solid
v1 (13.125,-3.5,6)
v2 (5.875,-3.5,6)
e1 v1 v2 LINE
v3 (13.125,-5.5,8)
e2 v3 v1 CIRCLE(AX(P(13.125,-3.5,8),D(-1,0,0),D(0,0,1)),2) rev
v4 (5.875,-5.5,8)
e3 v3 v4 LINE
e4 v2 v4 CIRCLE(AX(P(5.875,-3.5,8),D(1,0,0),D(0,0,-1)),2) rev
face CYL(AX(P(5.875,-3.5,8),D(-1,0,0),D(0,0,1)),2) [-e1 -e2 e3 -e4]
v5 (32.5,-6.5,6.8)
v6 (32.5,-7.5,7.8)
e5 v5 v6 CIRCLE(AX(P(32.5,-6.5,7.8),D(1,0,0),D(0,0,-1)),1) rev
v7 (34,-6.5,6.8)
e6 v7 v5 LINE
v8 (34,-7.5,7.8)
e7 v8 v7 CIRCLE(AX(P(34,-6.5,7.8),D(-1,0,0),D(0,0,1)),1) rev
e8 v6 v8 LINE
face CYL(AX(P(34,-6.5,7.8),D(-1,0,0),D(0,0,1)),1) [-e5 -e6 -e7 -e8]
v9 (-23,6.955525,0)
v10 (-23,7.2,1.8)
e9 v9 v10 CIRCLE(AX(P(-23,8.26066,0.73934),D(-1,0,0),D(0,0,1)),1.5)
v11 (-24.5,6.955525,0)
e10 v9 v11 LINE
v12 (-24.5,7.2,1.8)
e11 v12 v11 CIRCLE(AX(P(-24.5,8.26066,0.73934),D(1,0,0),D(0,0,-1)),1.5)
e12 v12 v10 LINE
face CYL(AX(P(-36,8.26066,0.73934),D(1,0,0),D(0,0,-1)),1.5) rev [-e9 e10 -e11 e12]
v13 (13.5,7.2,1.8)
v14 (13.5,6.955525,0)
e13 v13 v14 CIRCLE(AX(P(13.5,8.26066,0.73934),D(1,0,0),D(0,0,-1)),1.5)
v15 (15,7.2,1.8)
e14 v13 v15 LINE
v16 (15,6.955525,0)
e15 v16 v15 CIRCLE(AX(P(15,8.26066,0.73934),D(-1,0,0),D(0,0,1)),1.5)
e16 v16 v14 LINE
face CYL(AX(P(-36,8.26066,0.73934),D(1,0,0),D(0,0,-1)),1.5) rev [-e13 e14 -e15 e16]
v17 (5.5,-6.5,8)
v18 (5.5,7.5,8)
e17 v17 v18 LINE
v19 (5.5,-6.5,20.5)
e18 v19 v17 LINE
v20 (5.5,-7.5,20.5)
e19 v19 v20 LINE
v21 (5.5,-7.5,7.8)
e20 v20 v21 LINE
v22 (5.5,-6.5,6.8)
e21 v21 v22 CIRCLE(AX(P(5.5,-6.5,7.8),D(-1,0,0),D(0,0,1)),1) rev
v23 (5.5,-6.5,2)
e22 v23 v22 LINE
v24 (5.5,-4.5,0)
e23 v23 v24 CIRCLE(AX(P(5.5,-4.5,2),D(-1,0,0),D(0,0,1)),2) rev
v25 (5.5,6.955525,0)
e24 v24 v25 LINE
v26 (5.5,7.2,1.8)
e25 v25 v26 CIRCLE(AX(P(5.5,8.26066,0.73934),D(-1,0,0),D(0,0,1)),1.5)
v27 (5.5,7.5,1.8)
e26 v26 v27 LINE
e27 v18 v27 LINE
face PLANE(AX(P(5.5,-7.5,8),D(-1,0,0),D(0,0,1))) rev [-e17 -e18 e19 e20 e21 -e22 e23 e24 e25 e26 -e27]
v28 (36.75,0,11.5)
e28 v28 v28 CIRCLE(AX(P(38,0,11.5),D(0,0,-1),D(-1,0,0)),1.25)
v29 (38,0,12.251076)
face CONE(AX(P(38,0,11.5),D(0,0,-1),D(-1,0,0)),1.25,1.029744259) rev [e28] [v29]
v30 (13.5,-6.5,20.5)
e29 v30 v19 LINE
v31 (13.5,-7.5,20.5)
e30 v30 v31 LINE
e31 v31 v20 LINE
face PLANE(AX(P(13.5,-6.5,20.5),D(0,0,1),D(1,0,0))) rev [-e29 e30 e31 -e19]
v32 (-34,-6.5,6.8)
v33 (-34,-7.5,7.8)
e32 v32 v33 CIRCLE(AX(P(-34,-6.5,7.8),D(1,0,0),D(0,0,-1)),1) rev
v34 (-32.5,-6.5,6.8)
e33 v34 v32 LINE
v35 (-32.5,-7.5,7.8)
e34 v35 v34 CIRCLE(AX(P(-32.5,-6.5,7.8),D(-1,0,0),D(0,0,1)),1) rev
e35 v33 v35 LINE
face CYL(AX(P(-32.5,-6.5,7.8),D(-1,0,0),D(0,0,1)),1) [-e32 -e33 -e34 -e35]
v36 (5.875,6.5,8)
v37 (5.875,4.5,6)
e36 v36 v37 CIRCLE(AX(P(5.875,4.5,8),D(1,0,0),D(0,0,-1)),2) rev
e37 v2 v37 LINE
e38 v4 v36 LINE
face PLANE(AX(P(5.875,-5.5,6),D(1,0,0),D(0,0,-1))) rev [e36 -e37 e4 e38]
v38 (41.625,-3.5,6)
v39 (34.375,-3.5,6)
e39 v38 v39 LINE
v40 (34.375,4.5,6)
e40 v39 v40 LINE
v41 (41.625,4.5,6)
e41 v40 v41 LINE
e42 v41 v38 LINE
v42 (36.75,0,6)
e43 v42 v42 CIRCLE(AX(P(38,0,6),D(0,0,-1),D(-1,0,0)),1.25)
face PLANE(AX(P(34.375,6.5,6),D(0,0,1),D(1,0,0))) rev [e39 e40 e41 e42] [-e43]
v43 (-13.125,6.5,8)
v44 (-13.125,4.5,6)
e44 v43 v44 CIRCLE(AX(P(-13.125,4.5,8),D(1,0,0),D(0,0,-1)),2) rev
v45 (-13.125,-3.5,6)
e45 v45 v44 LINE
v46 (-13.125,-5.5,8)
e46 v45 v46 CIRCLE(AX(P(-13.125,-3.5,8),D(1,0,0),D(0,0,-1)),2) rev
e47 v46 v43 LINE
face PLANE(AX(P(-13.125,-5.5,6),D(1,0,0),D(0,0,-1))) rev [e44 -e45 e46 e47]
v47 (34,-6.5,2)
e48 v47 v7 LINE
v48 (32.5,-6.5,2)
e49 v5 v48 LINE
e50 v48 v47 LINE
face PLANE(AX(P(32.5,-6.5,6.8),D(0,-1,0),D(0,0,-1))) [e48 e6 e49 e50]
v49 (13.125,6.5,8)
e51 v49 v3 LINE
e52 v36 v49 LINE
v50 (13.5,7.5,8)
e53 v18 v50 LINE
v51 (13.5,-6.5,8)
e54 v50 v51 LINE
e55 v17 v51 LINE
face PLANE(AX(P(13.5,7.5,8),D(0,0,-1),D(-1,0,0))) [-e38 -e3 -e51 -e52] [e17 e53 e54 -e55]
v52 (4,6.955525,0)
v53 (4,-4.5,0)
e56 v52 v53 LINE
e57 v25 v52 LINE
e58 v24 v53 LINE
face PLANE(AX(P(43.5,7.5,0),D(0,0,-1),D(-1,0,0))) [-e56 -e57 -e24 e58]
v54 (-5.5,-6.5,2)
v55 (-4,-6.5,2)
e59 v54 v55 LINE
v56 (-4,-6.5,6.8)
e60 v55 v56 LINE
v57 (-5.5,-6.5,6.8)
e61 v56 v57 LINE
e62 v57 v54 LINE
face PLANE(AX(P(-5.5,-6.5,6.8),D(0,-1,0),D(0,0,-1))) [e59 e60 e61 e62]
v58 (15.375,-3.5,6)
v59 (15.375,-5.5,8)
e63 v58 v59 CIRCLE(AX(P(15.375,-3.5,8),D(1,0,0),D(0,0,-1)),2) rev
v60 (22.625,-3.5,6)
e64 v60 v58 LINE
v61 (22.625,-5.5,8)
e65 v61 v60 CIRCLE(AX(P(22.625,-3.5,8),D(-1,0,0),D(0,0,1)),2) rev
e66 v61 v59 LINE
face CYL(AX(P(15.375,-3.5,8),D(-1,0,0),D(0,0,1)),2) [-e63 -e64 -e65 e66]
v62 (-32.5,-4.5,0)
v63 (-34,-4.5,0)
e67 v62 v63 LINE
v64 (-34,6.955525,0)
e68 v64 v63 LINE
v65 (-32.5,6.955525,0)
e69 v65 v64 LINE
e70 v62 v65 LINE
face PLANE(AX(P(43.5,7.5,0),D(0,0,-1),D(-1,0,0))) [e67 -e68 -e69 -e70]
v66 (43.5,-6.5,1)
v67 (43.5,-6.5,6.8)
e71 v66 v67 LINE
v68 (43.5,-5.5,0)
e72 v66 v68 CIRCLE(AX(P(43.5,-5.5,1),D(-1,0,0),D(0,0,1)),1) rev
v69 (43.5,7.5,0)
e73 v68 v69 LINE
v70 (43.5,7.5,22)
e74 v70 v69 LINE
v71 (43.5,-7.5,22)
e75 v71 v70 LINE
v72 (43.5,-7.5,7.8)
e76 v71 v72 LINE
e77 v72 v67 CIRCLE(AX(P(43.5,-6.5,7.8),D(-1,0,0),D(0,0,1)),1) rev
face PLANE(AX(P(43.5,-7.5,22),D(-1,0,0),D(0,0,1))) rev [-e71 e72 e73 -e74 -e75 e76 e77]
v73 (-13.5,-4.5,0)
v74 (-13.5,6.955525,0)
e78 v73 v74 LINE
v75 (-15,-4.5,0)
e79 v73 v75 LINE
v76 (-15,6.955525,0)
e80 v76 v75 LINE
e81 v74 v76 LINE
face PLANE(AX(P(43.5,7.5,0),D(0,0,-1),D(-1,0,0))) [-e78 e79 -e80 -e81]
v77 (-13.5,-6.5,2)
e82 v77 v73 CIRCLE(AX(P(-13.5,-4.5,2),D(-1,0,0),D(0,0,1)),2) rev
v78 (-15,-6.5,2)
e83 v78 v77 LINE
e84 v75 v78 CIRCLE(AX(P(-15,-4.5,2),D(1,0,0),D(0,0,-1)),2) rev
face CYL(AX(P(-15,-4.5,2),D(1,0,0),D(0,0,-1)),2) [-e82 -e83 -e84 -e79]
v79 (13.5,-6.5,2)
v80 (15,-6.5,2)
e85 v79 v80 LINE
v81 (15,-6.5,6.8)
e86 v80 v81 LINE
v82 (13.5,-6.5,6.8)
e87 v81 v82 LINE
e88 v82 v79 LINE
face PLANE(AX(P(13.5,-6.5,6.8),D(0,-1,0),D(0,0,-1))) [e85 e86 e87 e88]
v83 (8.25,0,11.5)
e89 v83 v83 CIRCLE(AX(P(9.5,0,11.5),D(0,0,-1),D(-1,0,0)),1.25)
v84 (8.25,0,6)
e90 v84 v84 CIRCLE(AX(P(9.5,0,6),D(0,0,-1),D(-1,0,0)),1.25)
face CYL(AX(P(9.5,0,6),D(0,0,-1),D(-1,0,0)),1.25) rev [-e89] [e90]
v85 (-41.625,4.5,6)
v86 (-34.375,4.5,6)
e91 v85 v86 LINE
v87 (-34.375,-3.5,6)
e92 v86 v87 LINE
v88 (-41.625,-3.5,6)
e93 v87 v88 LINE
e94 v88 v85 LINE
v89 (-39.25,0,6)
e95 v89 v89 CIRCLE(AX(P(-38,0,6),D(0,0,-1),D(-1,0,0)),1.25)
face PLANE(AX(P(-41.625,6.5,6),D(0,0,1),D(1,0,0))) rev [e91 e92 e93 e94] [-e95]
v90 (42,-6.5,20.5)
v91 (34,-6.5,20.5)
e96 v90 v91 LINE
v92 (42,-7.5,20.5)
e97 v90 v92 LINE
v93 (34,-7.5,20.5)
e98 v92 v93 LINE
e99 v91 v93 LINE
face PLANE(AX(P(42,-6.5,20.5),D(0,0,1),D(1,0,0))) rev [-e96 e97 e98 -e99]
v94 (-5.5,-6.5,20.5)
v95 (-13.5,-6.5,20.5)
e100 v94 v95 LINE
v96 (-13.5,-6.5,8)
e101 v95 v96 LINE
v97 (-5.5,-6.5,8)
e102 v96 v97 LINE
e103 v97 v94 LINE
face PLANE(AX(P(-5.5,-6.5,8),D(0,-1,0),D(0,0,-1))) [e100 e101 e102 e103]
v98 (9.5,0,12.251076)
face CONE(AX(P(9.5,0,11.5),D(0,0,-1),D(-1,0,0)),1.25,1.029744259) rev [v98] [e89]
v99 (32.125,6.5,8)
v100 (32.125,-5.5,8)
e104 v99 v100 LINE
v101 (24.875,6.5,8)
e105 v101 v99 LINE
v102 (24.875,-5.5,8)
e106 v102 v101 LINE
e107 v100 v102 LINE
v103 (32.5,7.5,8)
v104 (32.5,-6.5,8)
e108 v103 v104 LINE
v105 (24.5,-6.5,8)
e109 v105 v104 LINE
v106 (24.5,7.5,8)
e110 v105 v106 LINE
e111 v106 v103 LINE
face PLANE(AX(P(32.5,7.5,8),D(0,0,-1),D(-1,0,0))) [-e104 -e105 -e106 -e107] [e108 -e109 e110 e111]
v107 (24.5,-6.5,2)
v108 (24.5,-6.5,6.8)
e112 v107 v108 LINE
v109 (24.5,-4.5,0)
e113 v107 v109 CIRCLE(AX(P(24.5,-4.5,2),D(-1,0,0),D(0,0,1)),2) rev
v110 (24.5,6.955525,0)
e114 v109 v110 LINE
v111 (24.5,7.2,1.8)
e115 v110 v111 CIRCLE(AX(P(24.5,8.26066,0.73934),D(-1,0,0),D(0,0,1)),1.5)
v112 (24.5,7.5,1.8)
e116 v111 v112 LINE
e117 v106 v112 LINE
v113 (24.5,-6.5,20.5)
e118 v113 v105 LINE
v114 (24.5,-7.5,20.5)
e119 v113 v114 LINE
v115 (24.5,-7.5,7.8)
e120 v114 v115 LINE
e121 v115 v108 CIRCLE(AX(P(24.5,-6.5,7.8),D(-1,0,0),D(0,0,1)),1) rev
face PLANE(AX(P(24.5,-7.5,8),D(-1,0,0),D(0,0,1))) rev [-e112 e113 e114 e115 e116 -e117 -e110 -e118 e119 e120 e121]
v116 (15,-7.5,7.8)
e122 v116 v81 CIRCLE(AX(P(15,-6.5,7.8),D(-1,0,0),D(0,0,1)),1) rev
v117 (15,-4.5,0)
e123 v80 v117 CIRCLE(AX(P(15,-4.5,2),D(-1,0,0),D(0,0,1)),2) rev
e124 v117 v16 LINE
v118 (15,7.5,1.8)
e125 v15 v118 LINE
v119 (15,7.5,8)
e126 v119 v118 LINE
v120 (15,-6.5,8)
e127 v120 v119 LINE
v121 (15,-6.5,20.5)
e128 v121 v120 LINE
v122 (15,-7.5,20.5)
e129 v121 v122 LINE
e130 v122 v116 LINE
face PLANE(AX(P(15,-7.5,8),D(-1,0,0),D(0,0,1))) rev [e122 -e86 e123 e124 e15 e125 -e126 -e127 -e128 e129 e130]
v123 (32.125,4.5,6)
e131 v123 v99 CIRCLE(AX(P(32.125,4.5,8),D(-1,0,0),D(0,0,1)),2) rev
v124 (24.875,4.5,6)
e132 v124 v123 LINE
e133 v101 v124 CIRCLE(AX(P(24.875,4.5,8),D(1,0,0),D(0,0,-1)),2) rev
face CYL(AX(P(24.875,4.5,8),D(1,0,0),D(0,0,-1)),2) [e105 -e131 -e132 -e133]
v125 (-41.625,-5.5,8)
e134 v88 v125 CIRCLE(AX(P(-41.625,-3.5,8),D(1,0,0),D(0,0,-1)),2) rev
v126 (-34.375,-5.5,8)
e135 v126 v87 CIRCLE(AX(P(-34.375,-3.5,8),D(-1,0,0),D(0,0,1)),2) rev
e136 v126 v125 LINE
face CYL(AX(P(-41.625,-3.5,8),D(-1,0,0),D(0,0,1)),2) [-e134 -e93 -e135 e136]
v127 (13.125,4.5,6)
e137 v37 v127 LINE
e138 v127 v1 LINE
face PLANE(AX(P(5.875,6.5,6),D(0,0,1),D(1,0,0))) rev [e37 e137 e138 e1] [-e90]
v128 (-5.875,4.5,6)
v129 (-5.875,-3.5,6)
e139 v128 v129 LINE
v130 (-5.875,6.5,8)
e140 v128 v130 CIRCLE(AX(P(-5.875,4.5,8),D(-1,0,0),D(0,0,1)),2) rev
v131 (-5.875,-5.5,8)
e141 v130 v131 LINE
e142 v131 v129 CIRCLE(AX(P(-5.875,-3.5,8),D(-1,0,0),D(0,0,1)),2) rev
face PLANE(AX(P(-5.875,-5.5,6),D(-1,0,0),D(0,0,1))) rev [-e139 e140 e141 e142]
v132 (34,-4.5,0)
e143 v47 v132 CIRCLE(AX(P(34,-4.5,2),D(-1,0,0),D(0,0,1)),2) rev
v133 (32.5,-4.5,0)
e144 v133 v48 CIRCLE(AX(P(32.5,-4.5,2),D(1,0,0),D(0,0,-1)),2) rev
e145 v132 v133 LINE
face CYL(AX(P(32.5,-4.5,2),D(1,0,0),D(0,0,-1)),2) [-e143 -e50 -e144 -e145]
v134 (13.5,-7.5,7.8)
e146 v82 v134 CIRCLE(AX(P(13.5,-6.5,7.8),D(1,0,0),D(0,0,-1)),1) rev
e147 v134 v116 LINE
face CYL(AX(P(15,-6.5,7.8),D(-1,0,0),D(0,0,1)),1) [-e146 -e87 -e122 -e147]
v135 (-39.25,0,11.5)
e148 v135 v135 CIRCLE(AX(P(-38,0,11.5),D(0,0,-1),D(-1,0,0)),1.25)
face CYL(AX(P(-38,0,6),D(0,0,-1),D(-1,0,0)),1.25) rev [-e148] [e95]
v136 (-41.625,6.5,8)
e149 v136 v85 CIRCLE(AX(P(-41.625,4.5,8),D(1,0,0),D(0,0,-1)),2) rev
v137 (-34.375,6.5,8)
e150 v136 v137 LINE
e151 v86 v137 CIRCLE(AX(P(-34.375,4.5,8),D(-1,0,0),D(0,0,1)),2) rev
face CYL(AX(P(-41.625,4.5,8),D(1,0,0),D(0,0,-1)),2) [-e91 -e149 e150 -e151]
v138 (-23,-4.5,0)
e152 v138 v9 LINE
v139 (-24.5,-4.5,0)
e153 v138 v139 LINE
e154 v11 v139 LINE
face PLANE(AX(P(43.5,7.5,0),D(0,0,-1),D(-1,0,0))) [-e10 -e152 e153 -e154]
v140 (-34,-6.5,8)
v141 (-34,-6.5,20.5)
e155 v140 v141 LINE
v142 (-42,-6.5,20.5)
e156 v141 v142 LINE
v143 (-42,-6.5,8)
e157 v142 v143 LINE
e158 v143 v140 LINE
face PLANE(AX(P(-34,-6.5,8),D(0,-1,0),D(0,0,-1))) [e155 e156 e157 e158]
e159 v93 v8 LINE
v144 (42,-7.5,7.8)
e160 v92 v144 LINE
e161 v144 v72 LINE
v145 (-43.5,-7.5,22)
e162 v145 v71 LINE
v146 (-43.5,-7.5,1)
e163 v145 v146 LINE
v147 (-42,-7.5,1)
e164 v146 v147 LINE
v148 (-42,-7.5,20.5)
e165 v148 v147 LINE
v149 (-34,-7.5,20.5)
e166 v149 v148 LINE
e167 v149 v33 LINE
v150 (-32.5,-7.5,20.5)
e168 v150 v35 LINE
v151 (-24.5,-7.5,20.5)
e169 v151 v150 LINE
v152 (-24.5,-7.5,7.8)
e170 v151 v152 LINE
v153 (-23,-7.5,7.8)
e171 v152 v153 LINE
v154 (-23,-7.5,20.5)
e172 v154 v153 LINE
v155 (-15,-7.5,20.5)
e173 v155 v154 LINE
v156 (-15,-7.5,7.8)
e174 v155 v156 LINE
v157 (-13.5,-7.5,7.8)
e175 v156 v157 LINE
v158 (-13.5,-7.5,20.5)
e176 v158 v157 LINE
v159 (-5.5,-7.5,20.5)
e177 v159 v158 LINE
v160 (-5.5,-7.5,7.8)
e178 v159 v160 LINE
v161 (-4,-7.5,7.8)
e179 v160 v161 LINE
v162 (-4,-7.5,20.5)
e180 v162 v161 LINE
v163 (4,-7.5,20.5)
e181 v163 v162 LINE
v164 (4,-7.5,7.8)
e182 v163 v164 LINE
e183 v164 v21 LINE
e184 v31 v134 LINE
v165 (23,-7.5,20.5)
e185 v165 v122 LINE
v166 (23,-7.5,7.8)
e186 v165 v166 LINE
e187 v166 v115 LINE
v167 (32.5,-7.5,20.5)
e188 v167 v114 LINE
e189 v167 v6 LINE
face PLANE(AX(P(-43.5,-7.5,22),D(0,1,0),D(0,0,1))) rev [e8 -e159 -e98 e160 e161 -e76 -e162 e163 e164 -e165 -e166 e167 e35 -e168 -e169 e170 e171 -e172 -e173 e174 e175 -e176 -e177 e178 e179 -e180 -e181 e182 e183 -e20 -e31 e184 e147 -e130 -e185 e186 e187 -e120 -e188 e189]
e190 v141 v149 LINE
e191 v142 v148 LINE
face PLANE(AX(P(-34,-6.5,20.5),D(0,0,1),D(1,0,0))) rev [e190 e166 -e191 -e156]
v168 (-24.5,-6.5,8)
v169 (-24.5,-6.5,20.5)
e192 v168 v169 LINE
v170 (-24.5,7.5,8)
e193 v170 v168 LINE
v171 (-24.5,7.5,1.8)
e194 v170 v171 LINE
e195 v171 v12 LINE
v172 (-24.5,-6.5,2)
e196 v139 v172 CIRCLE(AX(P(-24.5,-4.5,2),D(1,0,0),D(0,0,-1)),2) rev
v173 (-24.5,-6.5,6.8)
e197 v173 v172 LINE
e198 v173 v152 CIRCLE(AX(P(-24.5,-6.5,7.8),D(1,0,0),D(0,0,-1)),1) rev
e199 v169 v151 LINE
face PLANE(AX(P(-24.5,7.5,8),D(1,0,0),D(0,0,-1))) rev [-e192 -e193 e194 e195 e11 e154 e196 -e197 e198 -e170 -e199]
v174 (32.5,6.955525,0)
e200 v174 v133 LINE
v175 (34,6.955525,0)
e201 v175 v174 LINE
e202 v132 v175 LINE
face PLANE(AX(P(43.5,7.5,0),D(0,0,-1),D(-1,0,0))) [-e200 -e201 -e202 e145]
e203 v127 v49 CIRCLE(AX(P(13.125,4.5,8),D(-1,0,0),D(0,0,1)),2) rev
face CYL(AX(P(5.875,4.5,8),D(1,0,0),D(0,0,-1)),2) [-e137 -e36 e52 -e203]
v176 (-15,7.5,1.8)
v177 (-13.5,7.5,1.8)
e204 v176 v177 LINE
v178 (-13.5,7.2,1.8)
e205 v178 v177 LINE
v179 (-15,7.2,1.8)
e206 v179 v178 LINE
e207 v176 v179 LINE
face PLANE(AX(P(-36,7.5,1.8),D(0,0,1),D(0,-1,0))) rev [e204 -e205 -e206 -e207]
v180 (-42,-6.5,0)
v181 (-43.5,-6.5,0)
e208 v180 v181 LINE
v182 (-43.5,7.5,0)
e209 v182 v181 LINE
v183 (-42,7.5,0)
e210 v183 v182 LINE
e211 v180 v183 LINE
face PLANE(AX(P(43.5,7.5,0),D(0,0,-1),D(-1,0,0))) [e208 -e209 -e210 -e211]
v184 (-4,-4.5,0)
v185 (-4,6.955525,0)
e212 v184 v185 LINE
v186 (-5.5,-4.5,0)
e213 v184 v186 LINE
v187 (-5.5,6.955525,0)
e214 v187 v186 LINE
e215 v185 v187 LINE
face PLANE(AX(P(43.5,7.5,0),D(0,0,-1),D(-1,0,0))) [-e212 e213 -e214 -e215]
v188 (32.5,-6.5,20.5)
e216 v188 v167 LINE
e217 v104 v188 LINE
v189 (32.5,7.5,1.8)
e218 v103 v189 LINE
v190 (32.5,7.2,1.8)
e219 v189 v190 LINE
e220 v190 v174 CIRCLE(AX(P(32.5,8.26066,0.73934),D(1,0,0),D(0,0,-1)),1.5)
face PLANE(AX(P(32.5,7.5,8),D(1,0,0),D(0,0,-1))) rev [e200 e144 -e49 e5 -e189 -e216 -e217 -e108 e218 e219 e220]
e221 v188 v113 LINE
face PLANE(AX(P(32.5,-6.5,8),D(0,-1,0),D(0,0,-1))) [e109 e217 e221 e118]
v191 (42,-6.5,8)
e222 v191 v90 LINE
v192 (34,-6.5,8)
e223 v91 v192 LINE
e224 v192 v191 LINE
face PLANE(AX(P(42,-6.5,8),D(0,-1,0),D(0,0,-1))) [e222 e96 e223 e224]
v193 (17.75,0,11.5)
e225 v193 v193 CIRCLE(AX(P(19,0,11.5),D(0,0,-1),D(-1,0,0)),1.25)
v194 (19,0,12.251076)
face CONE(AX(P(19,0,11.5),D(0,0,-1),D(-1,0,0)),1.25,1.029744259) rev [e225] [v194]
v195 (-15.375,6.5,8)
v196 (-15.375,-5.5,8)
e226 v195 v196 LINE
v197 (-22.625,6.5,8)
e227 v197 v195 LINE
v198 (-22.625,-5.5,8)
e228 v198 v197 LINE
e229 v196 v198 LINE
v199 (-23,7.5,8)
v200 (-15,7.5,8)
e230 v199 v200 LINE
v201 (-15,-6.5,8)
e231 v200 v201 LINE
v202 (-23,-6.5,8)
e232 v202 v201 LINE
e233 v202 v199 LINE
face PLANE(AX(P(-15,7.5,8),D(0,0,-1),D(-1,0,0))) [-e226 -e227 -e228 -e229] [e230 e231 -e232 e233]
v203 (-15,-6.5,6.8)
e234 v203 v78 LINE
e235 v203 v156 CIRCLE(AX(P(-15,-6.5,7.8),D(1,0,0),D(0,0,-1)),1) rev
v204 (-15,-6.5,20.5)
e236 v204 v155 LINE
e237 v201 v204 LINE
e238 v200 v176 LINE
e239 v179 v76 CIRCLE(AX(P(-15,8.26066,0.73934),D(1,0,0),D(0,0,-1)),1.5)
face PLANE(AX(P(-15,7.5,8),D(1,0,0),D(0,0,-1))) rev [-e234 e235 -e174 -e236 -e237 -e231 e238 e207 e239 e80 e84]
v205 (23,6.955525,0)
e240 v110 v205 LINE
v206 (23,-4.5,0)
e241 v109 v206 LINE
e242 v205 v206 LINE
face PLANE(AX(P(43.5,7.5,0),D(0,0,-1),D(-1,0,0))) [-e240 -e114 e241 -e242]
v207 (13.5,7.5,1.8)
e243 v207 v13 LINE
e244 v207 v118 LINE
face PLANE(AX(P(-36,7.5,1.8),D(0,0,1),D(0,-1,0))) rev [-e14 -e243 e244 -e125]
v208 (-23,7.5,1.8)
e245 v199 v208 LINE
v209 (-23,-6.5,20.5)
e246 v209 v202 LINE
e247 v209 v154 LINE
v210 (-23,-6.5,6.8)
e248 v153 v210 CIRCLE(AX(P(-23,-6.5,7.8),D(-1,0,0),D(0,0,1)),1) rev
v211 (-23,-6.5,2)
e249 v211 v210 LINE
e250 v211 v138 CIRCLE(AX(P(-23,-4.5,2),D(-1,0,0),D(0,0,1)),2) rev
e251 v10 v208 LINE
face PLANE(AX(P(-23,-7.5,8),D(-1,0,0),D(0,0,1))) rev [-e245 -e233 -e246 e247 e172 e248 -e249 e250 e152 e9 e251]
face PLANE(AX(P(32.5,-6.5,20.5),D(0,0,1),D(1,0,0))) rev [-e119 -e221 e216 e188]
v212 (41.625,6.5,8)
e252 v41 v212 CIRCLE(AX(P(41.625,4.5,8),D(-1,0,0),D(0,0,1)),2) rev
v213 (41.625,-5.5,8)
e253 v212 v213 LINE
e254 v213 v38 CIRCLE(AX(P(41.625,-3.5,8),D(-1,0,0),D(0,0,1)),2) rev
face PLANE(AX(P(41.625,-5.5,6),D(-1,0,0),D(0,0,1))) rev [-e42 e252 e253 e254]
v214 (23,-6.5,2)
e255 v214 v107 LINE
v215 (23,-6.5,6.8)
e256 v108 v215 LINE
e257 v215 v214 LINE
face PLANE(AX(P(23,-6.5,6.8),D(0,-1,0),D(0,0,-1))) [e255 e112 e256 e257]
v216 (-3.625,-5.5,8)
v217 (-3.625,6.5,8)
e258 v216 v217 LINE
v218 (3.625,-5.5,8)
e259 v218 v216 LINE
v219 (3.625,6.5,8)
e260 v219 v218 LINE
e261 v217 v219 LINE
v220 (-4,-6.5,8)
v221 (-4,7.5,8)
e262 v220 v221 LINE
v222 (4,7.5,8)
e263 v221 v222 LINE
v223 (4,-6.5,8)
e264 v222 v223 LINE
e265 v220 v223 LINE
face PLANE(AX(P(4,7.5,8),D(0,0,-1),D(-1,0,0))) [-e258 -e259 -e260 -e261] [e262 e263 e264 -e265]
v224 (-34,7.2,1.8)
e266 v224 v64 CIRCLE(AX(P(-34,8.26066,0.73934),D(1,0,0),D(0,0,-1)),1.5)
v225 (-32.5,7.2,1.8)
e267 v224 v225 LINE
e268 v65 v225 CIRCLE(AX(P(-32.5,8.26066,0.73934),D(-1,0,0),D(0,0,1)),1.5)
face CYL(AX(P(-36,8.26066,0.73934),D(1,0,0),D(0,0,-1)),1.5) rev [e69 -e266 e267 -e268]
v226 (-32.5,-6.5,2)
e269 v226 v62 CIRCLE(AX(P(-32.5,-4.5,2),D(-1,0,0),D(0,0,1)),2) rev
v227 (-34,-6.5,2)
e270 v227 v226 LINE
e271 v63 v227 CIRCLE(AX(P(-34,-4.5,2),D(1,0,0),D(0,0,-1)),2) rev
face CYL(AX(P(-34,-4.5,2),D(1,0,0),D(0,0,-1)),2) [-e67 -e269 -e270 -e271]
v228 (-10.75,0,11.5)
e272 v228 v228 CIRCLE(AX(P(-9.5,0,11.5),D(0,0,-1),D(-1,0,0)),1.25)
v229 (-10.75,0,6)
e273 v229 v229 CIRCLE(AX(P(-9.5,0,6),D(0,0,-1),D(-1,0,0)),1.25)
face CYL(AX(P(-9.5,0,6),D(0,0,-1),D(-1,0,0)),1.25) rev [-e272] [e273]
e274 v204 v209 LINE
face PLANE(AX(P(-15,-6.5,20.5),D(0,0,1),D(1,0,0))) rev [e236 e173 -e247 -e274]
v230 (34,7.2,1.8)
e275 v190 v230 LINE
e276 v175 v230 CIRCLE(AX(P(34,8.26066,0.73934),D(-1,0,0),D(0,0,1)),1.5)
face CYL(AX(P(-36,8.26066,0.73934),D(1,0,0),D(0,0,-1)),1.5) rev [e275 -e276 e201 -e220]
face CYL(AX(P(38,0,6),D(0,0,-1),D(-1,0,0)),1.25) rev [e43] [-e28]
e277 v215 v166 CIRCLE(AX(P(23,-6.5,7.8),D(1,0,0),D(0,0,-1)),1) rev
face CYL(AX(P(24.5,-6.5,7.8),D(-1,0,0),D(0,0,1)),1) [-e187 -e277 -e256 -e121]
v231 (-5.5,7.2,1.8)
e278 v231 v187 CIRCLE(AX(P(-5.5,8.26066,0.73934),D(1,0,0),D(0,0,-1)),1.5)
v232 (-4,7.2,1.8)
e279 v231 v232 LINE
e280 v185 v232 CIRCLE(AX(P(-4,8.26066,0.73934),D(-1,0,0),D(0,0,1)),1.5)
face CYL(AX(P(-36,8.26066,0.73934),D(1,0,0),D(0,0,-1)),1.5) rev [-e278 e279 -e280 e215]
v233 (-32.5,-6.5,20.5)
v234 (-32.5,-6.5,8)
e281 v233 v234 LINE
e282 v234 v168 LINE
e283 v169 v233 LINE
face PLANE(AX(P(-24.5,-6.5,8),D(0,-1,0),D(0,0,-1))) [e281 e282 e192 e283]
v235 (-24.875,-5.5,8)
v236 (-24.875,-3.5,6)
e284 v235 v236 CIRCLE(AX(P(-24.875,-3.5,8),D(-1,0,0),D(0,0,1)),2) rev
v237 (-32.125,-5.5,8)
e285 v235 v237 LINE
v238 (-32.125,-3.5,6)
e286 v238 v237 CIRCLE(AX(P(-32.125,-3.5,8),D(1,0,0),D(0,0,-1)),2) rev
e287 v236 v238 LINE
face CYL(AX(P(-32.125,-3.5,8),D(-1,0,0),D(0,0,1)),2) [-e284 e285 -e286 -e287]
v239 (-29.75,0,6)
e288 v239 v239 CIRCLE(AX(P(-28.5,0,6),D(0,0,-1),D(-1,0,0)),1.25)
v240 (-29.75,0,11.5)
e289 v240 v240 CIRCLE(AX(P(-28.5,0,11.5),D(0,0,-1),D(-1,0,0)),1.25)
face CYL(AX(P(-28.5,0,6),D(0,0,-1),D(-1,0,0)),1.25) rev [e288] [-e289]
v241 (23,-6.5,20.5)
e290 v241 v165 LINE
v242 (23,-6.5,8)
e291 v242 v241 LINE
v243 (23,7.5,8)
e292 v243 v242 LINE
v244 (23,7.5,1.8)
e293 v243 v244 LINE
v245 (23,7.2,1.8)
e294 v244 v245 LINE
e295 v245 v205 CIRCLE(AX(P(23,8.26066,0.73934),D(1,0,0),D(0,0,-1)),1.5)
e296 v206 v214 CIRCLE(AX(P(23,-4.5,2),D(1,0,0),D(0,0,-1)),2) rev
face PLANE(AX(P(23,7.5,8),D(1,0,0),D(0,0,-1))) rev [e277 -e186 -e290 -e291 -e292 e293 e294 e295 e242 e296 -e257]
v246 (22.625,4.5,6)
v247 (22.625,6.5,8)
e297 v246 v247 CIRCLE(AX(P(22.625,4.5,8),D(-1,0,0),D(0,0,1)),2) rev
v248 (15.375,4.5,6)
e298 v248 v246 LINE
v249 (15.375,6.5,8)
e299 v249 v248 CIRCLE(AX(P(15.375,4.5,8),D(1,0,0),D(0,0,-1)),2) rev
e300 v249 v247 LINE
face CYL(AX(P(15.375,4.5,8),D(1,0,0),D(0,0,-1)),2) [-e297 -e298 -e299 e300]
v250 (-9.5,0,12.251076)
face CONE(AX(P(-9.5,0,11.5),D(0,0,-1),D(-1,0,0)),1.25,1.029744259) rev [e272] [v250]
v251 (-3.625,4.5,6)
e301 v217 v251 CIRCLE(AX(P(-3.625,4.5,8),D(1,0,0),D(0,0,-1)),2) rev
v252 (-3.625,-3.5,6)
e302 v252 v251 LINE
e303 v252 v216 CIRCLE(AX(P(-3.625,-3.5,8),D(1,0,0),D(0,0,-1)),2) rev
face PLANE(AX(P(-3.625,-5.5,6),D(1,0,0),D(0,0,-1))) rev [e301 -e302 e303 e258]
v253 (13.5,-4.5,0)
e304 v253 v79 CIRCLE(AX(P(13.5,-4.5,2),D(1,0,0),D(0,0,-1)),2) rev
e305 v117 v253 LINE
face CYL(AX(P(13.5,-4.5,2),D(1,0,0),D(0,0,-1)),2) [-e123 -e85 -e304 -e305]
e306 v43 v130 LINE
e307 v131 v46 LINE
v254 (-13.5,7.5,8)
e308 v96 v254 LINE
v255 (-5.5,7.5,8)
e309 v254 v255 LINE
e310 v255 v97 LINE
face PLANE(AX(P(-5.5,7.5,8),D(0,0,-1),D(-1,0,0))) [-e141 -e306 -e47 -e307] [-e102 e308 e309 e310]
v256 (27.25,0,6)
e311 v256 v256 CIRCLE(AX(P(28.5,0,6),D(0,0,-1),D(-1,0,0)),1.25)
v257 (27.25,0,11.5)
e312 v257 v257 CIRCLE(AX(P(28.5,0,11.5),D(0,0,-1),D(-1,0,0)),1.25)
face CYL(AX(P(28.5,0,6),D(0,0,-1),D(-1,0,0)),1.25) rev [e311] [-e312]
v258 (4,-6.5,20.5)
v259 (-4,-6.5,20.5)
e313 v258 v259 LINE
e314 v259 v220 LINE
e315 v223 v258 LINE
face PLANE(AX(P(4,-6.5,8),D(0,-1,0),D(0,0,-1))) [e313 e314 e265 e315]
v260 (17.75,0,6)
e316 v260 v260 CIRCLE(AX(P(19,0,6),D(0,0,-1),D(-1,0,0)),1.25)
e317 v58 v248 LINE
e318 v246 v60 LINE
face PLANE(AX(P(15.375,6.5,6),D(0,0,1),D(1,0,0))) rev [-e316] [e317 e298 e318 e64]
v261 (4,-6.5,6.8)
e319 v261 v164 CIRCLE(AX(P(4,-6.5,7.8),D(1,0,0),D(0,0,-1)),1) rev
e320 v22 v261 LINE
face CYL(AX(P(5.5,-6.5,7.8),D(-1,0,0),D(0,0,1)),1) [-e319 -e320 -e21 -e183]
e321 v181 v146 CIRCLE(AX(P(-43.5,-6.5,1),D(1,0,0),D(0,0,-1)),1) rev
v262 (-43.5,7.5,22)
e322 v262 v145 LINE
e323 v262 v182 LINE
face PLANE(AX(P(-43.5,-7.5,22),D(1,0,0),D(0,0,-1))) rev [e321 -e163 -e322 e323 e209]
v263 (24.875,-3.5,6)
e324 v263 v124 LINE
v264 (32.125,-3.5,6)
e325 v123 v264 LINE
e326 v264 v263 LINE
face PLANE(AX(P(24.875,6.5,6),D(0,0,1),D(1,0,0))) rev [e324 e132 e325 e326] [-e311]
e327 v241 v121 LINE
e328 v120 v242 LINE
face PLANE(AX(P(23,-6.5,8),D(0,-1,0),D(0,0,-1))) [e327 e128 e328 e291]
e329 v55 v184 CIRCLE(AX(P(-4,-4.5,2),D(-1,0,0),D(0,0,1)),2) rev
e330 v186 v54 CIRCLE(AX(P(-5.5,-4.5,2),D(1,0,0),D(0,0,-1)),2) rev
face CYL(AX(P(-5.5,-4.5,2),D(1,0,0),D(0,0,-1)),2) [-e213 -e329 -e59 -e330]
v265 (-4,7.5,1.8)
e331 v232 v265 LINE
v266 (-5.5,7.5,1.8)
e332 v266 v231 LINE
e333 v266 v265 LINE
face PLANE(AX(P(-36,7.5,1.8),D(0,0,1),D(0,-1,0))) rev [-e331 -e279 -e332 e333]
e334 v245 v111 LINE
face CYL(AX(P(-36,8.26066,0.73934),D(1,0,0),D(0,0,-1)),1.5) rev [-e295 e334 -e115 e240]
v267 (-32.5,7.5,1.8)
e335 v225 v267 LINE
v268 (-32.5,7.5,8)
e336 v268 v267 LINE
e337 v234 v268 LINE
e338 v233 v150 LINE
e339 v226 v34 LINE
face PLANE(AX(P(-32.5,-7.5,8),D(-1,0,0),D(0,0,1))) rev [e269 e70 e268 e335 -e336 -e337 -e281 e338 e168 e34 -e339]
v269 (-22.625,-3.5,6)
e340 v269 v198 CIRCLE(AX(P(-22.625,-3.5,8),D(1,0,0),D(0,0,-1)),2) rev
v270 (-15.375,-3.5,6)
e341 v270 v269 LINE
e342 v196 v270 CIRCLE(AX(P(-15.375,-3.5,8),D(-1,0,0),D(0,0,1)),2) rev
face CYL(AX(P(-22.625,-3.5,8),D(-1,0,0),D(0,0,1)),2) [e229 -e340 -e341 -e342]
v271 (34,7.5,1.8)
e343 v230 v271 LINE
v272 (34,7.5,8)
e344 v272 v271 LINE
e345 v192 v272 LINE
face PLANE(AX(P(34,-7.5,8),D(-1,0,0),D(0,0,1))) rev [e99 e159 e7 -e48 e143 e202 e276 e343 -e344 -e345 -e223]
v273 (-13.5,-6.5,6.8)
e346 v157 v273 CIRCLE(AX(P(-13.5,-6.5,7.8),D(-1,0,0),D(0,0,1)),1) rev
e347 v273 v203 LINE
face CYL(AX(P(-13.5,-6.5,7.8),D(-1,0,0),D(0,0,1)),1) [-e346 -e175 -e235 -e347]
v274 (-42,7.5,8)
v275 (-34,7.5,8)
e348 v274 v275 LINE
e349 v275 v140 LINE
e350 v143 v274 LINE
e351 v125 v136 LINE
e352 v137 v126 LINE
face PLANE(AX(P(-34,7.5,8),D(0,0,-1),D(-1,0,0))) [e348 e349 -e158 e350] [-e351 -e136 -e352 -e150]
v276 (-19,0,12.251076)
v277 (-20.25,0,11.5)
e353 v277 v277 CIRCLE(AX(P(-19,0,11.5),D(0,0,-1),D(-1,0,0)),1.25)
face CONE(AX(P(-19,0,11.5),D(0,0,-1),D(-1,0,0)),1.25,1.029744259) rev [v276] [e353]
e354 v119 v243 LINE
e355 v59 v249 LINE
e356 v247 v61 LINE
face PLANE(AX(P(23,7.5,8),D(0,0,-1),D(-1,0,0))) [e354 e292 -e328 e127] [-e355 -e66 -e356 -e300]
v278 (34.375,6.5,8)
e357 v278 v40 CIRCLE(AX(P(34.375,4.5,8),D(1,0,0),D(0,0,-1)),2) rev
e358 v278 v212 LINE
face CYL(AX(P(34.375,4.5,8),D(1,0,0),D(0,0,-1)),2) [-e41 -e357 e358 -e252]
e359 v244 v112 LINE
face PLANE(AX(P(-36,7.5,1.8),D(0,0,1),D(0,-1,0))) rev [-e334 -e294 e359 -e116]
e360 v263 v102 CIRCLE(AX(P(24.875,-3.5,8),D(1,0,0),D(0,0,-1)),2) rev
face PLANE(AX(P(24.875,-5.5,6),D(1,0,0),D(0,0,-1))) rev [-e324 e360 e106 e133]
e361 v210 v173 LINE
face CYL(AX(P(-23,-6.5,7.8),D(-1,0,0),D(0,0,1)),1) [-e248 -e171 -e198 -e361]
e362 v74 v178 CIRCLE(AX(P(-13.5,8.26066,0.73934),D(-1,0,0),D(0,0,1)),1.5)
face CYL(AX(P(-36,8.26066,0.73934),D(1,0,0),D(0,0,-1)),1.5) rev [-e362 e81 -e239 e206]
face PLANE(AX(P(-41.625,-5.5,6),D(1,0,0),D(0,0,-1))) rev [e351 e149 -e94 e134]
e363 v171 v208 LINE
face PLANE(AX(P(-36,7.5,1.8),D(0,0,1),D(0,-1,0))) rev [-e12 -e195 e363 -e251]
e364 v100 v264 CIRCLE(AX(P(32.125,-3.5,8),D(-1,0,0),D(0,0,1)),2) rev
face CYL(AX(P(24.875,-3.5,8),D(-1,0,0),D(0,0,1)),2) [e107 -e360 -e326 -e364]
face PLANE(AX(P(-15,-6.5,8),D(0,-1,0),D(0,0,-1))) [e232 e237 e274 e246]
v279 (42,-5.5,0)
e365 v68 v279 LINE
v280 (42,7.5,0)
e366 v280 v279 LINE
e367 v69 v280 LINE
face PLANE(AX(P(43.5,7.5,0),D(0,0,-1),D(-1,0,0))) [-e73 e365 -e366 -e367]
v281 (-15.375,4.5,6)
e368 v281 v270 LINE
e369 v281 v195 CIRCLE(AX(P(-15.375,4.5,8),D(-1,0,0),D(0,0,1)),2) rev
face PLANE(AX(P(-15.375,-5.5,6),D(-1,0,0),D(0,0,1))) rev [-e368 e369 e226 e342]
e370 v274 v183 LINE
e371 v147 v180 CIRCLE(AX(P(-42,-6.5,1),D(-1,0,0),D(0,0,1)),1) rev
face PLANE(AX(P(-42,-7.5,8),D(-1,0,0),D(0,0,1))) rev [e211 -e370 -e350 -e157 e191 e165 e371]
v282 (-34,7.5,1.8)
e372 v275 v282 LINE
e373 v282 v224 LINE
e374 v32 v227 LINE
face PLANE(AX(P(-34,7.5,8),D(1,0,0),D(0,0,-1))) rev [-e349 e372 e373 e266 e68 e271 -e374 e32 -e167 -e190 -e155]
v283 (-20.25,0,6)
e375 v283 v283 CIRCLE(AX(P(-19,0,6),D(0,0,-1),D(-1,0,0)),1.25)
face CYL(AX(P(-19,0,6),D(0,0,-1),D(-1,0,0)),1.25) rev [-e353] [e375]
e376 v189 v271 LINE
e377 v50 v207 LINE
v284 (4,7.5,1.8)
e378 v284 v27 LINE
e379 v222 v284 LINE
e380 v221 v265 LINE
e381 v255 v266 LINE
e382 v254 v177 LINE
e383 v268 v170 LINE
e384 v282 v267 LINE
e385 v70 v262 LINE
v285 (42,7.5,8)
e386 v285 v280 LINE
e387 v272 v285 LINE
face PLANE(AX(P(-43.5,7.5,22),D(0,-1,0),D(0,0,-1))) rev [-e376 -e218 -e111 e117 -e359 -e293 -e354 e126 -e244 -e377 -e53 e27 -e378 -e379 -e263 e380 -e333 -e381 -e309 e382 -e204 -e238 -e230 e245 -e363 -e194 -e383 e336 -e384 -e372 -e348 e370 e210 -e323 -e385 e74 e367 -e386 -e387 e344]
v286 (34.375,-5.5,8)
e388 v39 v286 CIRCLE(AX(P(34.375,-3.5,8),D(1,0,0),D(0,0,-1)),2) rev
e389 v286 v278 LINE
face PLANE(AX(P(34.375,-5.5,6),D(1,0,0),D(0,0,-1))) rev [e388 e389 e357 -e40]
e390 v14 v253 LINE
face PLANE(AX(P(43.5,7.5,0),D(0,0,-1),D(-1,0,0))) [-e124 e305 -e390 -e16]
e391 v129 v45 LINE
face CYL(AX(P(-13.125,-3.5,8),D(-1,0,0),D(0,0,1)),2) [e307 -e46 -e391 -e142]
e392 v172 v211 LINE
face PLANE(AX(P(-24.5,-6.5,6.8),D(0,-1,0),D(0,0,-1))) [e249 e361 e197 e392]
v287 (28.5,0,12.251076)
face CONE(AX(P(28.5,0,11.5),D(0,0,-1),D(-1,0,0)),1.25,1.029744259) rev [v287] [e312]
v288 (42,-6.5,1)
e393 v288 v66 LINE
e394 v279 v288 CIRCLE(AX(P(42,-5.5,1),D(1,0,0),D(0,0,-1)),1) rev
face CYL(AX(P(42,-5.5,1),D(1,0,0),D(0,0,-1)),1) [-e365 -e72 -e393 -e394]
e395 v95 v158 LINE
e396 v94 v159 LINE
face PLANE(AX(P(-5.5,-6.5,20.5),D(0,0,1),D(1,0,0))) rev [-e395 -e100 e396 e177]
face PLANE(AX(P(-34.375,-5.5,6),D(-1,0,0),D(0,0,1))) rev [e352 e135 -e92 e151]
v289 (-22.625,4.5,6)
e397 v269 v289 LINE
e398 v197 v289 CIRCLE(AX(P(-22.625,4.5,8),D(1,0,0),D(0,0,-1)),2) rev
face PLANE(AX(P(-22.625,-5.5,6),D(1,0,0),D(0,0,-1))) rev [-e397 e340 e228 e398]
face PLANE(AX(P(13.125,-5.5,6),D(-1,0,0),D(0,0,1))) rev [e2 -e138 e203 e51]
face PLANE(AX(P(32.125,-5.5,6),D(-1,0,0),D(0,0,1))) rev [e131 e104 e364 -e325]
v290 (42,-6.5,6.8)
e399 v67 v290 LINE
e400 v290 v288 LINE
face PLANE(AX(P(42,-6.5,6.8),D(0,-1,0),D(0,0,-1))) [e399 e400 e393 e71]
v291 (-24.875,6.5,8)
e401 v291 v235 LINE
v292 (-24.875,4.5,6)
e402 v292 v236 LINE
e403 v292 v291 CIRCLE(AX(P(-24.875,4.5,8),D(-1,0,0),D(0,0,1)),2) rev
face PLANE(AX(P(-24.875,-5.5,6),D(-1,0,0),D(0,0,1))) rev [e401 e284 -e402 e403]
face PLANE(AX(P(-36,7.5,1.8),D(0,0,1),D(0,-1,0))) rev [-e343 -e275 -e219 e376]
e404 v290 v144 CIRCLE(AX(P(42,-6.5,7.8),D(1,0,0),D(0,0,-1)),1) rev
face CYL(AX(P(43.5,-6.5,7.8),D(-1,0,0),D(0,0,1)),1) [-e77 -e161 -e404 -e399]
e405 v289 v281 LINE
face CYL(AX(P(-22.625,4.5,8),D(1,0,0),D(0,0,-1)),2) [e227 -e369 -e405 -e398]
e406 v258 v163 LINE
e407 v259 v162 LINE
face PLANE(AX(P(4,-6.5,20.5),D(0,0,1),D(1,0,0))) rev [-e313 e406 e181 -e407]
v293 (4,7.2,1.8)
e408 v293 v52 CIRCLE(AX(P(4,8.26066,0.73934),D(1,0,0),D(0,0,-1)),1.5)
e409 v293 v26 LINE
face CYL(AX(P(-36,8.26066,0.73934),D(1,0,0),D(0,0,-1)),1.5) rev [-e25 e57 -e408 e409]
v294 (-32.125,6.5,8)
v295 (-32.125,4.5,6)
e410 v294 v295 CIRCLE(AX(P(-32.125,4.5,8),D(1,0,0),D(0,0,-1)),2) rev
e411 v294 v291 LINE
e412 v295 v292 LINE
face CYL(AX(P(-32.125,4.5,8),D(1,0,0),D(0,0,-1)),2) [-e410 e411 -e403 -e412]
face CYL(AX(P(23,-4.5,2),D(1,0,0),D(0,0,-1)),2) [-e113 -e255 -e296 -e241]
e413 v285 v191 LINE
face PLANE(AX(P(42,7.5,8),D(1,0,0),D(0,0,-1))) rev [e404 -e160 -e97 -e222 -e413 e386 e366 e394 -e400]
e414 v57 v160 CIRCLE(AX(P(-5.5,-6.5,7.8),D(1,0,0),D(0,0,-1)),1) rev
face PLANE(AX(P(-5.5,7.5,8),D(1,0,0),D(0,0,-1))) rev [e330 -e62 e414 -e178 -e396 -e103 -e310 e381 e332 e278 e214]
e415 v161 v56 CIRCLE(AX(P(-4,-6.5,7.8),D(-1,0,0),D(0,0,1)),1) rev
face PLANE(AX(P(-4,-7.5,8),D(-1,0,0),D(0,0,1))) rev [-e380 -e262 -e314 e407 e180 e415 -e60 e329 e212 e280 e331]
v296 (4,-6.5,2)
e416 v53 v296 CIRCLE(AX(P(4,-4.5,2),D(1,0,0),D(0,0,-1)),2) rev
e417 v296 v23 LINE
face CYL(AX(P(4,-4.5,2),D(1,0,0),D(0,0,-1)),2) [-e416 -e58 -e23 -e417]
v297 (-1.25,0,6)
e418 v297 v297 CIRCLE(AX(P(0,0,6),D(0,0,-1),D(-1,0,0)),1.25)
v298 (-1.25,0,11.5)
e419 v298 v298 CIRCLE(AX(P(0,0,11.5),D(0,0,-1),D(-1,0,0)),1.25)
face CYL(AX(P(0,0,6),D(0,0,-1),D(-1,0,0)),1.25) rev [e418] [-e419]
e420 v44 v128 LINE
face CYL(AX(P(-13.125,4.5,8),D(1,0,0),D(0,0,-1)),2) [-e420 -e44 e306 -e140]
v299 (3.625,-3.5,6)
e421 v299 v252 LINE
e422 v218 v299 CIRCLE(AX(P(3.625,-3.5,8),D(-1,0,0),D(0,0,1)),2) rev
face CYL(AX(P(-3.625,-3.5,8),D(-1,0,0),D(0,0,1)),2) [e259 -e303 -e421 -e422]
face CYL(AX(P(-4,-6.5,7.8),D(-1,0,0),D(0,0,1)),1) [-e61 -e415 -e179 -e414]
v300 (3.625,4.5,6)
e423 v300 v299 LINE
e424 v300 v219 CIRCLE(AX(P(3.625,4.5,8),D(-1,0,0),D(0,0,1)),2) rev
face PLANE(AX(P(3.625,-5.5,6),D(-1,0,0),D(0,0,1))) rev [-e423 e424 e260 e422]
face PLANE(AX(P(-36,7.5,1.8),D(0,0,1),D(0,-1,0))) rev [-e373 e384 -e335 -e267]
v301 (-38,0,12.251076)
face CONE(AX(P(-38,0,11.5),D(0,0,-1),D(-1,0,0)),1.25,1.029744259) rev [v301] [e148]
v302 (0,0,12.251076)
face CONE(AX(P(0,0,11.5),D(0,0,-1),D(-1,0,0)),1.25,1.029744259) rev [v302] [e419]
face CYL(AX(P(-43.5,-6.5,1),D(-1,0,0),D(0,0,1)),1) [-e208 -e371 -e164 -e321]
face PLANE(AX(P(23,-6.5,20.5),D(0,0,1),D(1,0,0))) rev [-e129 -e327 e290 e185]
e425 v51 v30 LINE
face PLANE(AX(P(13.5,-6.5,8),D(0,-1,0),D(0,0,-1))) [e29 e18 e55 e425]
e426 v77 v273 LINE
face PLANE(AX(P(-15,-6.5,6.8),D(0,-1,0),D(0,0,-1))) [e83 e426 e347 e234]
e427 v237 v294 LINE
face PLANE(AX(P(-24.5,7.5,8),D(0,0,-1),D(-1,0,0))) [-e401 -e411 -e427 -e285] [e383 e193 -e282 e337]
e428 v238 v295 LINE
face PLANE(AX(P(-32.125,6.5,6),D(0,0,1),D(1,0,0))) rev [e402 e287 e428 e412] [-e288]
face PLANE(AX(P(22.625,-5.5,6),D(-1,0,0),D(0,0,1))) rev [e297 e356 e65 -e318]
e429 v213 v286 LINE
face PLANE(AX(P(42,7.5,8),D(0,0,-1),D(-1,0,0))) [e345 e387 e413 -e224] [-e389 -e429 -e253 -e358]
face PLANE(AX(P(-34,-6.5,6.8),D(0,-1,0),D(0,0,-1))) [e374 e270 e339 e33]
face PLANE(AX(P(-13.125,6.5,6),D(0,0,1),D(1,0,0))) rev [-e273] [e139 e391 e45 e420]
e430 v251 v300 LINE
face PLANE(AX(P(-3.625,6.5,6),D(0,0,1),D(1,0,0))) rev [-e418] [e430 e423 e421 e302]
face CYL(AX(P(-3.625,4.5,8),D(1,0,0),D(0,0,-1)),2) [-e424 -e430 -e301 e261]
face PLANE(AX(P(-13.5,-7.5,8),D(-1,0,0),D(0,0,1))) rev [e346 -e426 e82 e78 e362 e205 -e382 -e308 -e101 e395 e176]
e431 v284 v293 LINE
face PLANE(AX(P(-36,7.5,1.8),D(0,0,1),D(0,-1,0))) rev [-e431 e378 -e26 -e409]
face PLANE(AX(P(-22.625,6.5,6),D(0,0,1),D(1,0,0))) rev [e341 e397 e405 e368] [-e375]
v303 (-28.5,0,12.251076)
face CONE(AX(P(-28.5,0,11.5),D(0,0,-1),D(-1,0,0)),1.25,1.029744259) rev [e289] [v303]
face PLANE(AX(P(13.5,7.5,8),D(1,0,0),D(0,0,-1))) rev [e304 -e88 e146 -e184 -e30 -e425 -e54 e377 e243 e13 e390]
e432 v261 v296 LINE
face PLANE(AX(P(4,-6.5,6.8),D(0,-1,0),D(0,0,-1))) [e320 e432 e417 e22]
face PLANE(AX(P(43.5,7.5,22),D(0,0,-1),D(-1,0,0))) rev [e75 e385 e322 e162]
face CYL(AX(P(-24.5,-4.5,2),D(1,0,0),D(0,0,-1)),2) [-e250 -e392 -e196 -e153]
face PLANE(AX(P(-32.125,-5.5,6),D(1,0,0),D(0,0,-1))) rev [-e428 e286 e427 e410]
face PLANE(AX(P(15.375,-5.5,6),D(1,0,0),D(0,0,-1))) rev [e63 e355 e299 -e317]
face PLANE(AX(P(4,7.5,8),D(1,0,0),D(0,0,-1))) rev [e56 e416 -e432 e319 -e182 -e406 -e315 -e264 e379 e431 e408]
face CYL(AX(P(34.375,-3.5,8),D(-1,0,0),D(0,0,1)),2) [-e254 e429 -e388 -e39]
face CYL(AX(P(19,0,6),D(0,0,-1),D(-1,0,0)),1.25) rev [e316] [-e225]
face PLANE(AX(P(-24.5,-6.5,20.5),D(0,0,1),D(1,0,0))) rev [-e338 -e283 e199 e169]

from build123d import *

# Parameters (mm, degrees)
SKETCH_1_W             = 87
SKETCH_1_H             = 15
EXTRUDE_1_DEPTH        = 22
SKETCH_2_W             = 8
SKETCH_2_H             = 15
CUT_EXTRUDE_1_DEPTH    = 8
SKETCH_3_W             = 8
SKETCH_3_H             = 12.5
CUT_EXTRUDE_2_DEPTH    = 1
SKETCH_4_W             = 1.5
SKETCH_4_H             = 6.8
CUT_EXTRUDE_3_DEPTH    = 1
FILLET_1_R             = 1
SKETCH_5_W             = 7.25
SKETCH_5_H             = 12
EXTRUDE_2_DEPTH        = 2
FILLET_2_R             = 2
PATTERN_LINEAR_1_COUNT = 9
PATTERN_LINEAR_1_PITCH = 9.5
FILLET_3_R             = 1
FILLET_4_R             = 2
CUT_EXTRUDE_4_DEPTH    = 36


with BuildPart() as part:
    # Эскиз1 → Бобышка-Вытянуть1 (new body)
    with BuildSketch(Plane.XY):
        Rectangle(SKETCH_1_W, SKETCH_1_H)
    extrude(amount=EXTRUDE_1_DEPTH)

    # Эскиз2 → Вырез-Вытянуть1 (cut)
    with BuildSketch(Plane(origin=(0, 0, 0), x_dir=(-1, 0, 0), z_dir=(0, 0, -1))):
        with Locations((-38, 0)):
            Rectangle(SKETCH_2_W, SKETCH_2_H)
        with Locations((-28.5, 0)):
            Rectangle(SKETCH_2_W, SKETCH_2_H)
        with Locations((-19, 0)):
            Rectangle(SKETCH_2_W, SKETCH_2_H)
        with Locations((-9.5, 0)):
            Rectangle(SKETCH_2_W, SKETCH_2_H)
        Rectangle(SKETCH_2_W, SKETCH_2_H)
        with Locations((9.5, 0)):
            Rectangle(SKETCH_2_W, SKETCH_2_H)
        with Locations((19, 0)):
            Rectangle(SKETCH_2_W, SKETCH_2_H)
        with Locations((28.5, 0)):
            Rectangle(SKETCH_2_W, SKETCH_2_H)
        with Locations((38, 0)):
            Rectangle(SKETCH_2_W, SKETCH_2_H)
    extrude(amount=-CUT_EXTRUDE_1_DEPTH, mode=Mode.SUBTRACT)

    # Эскиз3 → Вырез-Вытянуть2 (cut)
    with BuildSketch(Plane.XZ.offset(7.5)):
        with Locations((-38, 14.25)):
            Rectangle(SKETCH_3_W, SKETCH_3_H)
        with Locations((-28.5, 14.25)):
            Rectangle(SKETCH_3_W, SKETCH_3_H)
        with Locations((-19, 14.25)):
            Rectangle(SKETCH_3_W, SKETCH_3_H)
        with Locations((-9.5, 14.25)):
            Rectangle(SKETCH_3_W, SKETCH_3_H)
        with Locations((0, 14.25)):
            Rectangle(SKETCH_3_W, SKETCH_3_H)
        with Locations((9.5, 14.25)):
            Rectangle(SKETCH_3_W, SKETCH_3_H)
        with Locations((19, 14.25)):
            Rectangle(SKETCH_3_W, SKETCH_3_H)
        with Locations((28.5, 14.25)):
            Rectangle(SKETCH_3_W, SKETCH_3_H)
        with Locations((38, 14.25)):
            Rectangle(SKETCH_3_W, SKETCH_3_H)
    extrude(amount=-CUT_EXTRUDE_2_DEPTH, mode=Mode.SUBTRACT)

    # Эскиз4 → Вырез-Вытянуть3 (cut)
    with BuildSketch(Plane.XZ.offset(7.5)):
        with Locations((-33.25, 3.4)):
            Rectangle(SKETCH_4_W, SKETCH_4_H)
        with Locations((-23.75, 3.4)):
            Rectangle(SKETCH_4_W, SKETCH_4_H)
        with Locations((-14.25, 3.4)):
            Rectangle(SKETCH_4_W, SKETCH_4_H)
        with Locations((-4.75, 3.4)):
            Rectangle(SKETCH_4_W, SKETCH_4_H)
        with Locations((4.75, 3.4)):
            Rectangle(SKETCH_4_W, SKETCH_4_H)
        with Locations((14.25, 3.4)):
            Rectangle(SKETCH_4_W, SKETCH_4_H)
        with Locations((23.75, 3.4)):
            Rectangle(SKETCH_4_W, SKETCH_4_H)
        with Locations((33.25, 3.4)):
            Rectangle(SKETCH_4_W, SKETCH_4_H)
        with Locations((42.75, 3.4)):
            Rectangle(SKETCH_4_W, SKETCH_4_H)
    extrude(amount=-CUT_EXTRUDE_3_DEPTH, mode=Mode.SUBTRACT)

    # Скругление1
    fillet_1_edges = [part.edges().sort_by_distance(p)[0] for p in [
        (42.75, -7.5, 6.8),
        (33.25, -7.5, 6.8),
        (23.75, -7.5, 6.8),
        (14.25, -7.5, 6.8),
        (4.75, -7.5, 6.8),
        (-4.75, -7.5, 6.8),
        (-14.25, -7.5, 6.8),
        (-23.75, -7.5, 6.8),
        (-33.25, -7.5, 6.8),
    ]]
    fillet(fillet_1_edges, radius=FILLET_1_R - 0.0001)  # a hair under: the kernel refuses the full size

    # Эскиз5 → Бобышка-Вытянуть2 (add)
    with BuildSketch(Plane(origin=(0, 0, 8), x_dir=(-1, 0, 0), z_dir=(0, 0, -1))):
        with Locations((-28.5, 0.5)):
            Rectangle(SKETCH_5_W, SKETCH_5_H)
        with Locations((-38, 0.5)):
            Rectangle(SKETCH_5_W, SKETCH_5_H)
        with Locations((-19, 0.5)):
            Rectangle(SKETCH_5_W, SKETCH_5_H)
        with Locations((-9.5, 0.5)):
            Rectangle(SKETCH_5_W, SKETCH_5_H)
        with Locations((0, 0.5)):
            Rectangle(SKETCH_5_W, SKETCH_5_H)
        with Locations((9.5, 0.5)):
            Rectangle(SKETCH_5_W, SKETCH_5_H)
        with Locations((19, 0.5)):
            Rectangle(SKETCH_5_W, SKETCH_5_H)
        with Locations((28.5, 0.5)):
            Rectangle(SKETCH_5_W, SKETCH_5_H)
        with Locations((38, 0.5)):
            Rectangle(SKETCH_5_W, SKETCH_5_H)
    extrude(amount=EXTRUDE_2_DEPTH)

    # Скругление2
    fillet_2_edges = [part.edges().sort_by_distance(p)[0] for p in [
        (38, 6.5, 6),
        (38, -5.5, 6),
        (28.5, 6.5, 6),
        (28.5, -5.5, 6),
        (19, 6.5, 6),
        (9.5, -5.5, 6),
        (19, -5.5, 6),
        (9.5, 6.5, 6),
        (0, 6.5, 6),
        (0, -5.5, 6),
        (-9.5, 6.5, 6),
        (-9.5, -5.5, 6),
        (-19, 6.5, 6),
        (-19, -5.5, 6),
        (-28.5, 6.5, 6),
        (-38, 6.5, 6),
        (-28.5, -5.5, 6),
        (-38, -5.5, 6),
    ]]
    fillet(fillet_2_edges, radius=FILLET_2_R - 0.0001)  # a hair under: the kernel refuses the full size

    # Эскиз6 → Отверстие обработанное метчиком M31 (revolve, cut)
    with BuildSketch(Plane(origin=(-38, 0, 6), x_dir=(0, 1, 0), z_dir=(1, 0, 0))):
        Polygon((0, 0), (0, 6.251075774), (1.25, 5.5), (1.25, 0), align=None)
    hole_wizard_m31 = revolve(axis=Axis((-38, 0, -0.35), (0, 0, 1)), mode=Mode.SUBTRACT)

    # Линейный массив1: Отверстие обработанное метчиком M31 ×9
    with Locations(*[(i * PATTERN_LINEAR_1_PITCH, 0, 0) for i in range(1, PATTERN_LINEAR_1_COUNT)]):
        add(hole_wizard_m31, mode=Mode.SUBTRACT)

    # Скругление3
    fillet_3_edges = [part.edges().sort_by_distance(p)[0] for p in [
        (42.75, -6.5, 0),
        (-42.75, -7.5, 0),
    ]]
    fillet(fillet_3_edges, radius=FILLET_3_R)

    # Скругление4
    fillet_4_edges = [part.edges().sort_by_distance(p)[0] for p in [
        (-33.25, -6.5, 0),
        (-23.75, -6.5, 0),
        (-14.25, -6.5, 0),
        (-4.75, -6.5, 0),
        (4.75, -6.5, 0),
        (14.25, -6.5, 0),
        (23.75, -6.5, 0),
        (33.25, -6.5, 0),
    ]]
    fillet(fillet_4_edges, radius=FILLET_4_R)

    # Эскиз8 → Вырез-Вытянуть4 (cut, symmetric)
    with BuildSketch(Plane(origin=(0, 0, 0), x_dir=(0, 0, -1), z_dir=(1, 0, 0))):
        with BuildLine():
            Line((-1.8, 7.5), (0.321320344, 7.5))
            Line((0.321320344, 7.5), (0.321320344, 7.2))
            ThreePointArc((0.321320344, 7.2), (-0.739339828, 6.760660172), (-1.8, 7.2))
            Line((-1.8, 7.2), (-1.8, 7.5))
        make_face()
    extrude(amount=CUT_EXTRUDE_4_DEPTH, both=True, mode=Mode.SUBTRACT)


solid = part.part
